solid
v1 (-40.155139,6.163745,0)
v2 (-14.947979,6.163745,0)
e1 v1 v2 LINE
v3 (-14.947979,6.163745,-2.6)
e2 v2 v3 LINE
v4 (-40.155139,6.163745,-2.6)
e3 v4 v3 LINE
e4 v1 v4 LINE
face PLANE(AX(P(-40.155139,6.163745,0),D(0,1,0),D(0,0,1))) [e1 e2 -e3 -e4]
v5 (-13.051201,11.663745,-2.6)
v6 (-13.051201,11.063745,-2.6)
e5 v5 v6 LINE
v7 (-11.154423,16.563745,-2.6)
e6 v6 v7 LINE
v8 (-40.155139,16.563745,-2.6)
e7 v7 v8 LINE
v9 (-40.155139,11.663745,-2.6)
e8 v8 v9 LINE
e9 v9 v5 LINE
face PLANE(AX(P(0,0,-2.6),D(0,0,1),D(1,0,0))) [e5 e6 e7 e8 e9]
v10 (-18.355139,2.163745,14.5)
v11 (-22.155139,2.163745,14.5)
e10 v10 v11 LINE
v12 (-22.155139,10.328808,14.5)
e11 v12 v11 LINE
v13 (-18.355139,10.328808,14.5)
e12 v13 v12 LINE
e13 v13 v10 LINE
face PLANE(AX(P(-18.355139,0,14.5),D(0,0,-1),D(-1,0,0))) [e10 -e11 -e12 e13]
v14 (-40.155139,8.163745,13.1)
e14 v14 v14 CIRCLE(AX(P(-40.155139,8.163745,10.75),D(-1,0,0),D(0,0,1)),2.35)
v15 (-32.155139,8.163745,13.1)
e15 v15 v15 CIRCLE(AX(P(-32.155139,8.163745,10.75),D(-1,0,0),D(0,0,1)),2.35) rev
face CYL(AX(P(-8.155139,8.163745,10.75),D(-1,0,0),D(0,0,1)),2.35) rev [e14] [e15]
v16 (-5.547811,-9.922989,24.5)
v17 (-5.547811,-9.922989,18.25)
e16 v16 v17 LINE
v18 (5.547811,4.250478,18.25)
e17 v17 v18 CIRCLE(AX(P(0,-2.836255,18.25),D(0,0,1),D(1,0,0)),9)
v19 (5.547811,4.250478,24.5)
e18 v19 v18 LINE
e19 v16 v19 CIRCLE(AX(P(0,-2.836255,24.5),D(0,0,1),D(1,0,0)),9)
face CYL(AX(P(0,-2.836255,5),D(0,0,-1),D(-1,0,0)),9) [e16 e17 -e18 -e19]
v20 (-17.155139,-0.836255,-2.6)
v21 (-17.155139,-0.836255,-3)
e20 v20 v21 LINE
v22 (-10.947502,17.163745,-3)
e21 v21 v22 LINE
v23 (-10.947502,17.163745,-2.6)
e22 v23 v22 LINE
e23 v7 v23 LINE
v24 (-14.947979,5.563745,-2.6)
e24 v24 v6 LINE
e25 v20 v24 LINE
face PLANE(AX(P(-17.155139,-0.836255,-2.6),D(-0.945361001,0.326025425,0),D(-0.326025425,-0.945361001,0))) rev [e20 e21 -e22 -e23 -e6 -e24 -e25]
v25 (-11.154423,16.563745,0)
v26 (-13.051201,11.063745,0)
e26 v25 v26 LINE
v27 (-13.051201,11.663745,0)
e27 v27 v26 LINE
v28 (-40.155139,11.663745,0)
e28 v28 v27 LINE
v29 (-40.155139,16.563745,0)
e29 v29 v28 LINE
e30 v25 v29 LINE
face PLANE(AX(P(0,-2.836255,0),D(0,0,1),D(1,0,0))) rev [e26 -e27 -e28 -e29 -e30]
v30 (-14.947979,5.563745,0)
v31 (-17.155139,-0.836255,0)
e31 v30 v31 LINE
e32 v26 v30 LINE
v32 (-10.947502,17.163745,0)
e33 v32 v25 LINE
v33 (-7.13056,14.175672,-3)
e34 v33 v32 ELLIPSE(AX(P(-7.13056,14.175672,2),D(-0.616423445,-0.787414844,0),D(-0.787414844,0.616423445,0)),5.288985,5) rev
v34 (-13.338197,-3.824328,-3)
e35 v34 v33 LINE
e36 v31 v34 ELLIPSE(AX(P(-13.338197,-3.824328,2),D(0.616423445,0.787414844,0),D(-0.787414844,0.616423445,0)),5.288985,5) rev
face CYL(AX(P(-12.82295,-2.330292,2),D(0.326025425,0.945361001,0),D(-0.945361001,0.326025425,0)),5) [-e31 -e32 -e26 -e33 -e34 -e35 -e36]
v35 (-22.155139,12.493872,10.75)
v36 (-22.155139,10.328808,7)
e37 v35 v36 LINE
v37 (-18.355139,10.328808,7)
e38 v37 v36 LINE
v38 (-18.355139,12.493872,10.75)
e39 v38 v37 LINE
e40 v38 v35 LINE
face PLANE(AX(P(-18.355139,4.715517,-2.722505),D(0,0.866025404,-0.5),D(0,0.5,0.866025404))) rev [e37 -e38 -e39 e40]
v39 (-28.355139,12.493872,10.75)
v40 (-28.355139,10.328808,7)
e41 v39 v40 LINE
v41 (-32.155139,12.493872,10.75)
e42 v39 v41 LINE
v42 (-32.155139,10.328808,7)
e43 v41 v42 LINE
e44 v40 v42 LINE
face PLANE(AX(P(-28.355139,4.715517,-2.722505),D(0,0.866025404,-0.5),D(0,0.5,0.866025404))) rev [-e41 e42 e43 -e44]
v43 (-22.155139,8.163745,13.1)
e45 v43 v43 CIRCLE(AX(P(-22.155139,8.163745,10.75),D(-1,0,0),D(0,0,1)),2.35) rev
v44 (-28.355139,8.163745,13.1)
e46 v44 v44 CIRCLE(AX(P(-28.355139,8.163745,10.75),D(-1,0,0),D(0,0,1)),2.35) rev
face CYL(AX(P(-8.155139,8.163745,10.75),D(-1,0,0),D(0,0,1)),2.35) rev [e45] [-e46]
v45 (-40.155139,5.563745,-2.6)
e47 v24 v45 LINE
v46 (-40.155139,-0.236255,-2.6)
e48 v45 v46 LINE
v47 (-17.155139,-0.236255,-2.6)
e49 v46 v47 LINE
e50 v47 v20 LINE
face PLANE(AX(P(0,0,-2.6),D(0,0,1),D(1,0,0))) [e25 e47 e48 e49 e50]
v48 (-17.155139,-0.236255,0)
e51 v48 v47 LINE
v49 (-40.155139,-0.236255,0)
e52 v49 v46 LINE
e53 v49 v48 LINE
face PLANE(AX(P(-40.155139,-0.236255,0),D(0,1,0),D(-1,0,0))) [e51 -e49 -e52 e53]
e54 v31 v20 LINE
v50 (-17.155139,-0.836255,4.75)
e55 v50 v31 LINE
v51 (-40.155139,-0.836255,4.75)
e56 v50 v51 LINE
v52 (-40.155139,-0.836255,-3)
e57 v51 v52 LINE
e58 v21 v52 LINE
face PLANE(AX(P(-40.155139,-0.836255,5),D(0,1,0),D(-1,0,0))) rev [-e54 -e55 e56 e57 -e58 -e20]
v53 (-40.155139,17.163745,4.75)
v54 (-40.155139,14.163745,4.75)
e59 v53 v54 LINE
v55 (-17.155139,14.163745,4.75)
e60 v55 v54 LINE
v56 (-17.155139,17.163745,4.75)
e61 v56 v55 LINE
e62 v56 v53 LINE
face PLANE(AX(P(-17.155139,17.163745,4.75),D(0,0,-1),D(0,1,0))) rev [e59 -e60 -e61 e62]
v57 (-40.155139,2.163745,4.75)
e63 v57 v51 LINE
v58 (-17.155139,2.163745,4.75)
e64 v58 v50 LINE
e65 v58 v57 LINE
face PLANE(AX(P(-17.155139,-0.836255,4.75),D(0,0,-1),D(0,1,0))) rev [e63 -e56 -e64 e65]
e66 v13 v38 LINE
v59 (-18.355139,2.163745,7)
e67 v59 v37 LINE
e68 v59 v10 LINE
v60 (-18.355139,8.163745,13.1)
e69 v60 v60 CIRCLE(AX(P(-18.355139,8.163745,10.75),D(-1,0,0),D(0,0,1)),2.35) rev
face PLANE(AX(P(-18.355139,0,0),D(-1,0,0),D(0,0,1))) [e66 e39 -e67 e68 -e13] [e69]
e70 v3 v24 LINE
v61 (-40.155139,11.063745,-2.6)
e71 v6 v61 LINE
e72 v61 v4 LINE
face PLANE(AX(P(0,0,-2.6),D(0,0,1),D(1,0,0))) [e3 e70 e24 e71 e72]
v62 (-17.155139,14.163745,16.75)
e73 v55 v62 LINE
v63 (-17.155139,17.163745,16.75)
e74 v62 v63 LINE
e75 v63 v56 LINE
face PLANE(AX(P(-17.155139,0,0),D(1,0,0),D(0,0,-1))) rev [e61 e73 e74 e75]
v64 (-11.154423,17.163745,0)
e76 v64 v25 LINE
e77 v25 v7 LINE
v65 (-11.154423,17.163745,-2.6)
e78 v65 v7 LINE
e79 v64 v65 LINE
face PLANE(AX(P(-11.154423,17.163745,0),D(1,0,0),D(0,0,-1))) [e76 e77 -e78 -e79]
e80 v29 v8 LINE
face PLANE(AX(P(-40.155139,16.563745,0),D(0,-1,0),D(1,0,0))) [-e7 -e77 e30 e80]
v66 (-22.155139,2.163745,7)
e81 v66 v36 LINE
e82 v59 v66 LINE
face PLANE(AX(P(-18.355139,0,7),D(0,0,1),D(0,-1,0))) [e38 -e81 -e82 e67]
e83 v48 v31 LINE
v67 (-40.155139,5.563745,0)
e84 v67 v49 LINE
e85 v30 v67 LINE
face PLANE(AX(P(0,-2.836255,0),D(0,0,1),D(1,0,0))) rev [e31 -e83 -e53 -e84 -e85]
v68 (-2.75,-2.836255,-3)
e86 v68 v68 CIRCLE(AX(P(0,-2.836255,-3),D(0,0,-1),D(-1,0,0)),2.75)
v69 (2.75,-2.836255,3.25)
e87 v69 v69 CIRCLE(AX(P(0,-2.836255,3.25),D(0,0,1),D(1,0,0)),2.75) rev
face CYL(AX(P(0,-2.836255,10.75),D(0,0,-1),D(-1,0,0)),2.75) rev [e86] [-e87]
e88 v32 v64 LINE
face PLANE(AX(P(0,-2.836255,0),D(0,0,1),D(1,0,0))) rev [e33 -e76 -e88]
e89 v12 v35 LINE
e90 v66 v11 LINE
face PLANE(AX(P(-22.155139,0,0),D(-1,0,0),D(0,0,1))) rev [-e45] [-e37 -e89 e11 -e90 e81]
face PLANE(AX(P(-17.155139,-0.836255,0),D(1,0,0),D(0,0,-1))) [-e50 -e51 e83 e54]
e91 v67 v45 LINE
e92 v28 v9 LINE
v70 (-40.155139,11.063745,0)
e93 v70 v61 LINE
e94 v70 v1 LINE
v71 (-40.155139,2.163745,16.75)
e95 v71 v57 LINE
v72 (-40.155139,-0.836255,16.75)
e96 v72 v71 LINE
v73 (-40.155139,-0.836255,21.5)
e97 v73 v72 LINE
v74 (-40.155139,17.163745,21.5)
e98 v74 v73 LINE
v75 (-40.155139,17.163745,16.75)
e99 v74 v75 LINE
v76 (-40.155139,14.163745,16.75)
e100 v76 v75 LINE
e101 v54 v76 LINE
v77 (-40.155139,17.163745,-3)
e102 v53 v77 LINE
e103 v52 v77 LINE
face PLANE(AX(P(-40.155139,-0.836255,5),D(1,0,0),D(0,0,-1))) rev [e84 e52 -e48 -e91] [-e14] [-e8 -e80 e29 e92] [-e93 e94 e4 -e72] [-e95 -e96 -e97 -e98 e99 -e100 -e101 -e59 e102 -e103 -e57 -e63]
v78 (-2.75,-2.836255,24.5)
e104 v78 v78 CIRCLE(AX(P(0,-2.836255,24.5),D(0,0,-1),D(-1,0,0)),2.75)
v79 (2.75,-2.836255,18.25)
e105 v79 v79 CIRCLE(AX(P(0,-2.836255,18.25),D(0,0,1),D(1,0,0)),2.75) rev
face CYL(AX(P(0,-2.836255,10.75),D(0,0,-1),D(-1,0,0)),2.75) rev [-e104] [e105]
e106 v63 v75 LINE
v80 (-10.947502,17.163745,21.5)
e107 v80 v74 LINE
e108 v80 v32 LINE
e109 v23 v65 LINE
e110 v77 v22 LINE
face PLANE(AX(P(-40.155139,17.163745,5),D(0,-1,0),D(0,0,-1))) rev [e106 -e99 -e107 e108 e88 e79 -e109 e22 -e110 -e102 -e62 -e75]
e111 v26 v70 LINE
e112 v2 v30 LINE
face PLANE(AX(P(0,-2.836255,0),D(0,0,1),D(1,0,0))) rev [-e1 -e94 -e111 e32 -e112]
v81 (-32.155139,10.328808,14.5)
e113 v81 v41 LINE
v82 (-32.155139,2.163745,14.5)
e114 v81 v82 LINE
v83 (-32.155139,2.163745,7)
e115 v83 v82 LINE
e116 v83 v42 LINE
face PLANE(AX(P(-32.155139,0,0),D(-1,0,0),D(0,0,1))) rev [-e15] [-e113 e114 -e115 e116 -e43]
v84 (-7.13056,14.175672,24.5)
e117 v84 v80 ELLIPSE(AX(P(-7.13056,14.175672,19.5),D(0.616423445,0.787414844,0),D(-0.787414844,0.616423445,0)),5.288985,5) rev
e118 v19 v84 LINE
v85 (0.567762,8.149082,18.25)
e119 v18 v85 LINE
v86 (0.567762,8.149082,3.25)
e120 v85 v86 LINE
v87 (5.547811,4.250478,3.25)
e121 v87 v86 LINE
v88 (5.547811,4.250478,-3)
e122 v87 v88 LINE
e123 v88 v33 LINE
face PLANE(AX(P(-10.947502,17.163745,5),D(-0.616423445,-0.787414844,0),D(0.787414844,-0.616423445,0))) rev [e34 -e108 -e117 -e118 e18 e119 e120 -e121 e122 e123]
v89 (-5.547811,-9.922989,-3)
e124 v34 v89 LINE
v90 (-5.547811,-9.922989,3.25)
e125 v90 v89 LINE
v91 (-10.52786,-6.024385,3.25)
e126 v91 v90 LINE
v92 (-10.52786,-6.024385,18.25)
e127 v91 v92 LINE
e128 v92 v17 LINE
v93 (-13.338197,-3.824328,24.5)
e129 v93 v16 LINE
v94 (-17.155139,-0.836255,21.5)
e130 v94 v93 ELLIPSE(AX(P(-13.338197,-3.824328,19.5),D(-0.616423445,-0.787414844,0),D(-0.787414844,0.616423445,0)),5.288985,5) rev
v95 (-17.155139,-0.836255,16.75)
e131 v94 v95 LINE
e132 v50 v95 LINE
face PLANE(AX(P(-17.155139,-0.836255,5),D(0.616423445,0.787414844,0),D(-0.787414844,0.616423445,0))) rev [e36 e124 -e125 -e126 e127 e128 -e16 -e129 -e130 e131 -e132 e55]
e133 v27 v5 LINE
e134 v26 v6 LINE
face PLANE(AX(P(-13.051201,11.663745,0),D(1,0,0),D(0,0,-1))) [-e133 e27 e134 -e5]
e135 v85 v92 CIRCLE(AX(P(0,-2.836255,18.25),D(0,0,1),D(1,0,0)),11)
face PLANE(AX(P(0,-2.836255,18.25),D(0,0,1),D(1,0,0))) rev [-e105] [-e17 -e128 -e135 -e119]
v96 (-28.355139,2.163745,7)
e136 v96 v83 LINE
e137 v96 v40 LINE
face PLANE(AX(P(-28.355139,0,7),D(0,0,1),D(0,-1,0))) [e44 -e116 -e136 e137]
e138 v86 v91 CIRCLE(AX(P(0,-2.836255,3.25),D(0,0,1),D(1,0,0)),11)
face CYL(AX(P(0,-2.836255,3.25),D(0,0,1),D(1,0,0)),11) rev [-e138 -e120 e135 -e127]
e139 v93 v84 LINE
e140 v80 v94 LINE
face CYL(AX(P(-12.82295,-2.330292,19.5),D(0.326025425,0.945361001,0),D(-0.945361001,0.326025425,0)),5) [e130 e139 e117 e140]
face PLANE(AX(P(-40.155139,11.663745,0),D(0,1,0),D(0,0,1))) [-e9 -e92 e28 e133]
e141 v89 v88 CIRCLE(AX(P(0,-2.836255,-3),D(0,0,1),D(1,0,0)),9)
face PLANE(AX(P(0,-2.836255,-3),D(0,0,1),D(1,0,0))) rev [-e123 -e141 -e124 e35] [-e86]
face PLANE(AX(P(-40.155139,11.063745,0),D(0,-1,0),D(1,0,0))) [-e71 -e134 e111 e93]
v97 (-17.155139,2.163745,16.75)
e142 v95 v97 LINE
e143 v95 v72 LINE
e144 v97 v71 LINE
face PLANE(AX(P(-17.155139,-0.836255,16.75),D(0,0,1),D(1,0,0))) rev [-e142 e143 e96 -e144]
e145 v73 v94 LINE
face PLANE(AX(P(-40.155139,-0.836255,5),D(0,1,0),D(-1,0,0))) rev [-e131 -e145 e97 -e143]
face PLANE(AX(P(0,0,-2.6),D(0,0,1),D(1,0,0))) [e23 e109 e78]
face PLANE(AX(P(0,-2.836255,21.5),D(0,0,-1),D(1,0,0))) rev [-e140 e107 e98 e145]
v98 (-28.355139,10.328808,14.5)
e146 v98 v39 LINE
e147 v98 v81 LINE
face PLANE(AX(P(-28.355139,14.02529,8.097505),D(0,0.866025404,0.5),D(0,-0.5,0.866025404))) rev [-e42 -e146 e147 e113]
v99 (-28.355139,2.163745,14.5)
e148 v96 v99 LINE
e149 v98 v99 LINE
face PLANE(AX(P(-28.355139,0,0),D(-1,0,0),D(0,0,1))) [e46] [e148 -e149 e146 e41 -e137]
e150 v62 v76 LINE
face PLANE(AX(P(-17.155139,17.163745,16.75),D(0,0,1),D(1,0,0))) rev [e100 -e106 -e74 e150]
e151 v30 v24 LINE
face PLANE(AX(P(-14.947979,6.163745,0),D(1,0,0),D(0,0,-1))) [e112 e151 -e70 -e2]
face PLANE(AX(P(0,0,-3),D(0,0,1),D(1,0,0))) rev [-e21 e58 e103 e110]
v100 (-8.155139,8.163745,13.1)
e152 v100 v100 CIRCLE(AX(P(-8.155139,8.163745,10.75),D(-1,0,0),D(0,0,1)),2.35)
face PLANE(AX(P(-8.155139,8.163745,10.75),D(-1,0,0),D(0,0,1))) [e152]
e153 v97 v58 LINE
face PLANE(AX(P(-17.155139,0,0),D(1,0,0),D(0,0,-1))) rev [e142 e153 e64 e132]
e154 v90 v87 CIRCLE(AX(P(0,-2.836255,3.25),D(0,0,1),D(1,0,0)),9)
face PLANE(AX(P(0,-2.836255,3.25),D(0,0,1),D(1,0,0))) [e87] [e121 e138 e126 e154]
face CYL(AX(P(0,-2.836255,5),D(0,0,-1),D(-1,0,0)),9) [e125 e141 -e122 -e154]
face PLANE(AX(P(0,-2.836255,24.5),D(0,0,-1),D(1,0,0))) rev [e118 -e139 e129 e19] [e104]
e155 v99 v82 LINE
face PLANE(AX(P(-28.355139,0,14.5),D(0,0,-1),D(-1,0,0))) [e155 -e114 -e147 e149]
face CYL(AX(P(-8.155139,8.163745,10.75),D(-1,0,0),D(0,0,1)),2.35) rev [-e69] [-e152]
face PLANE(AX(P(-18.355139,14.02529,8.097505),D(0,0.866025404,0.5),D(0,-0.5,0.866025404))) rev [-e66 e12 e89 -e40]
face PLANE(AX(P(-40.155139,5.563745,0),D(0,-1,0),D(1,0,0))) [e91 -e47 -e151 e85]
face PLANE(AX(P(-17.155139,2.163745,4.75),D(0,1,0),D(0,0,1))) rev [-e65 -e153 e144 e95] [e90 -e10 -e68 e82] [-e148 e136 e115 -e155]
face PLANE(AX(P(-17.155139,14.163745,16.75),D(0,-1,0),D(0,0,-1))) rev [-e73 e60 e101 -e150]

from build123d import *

# Parameters (mm, degrees)
BOSS_EXTRUDE1_DEPTH  = 5
BOSS_EXTRUDE7_DEPTH  = 5.75
BOSS_EXTRUDE8_START  = -3
BOSS_EXTRUDE8_DEPTH  = 3
SKETCH15_R           = 2.75
CUT_EXTRUDE7_DEPTH   = 46.783095044
FILLET2_R            = 5
SKETCH16_W           = 12
SKETCH16_H           = 3
CUT_EXTRUDE8_DEPTH   = 23
SKETCH17_R           = 2.35
CUT_EXTRUDE9_DEPTH   = 32
CUT_EXTRUDE11_START  = -8
CUT_EXTRUDE11_DEPTH  = 3.8
LPATTERN1_COUNT      = 2
LPATTERN1_PITCH      = 10
SKETCH26_R           = 11
CUT_EXTRUDE12_DEPTH  = 7.5
SKETCH28_W           = 29.000715486
SKETCH28_H           = 0.6
SKETCH28_W_2         = 23
SKETCH28_W_3         = 27.103937603
SKETCH28_W_4         = 25.207159719
BOSS_EXTRUDE9_DEPTH  = 3
BOSS_EXTRUDE10_DEPTH = 0.4


with BuildPart() as part:
    # Sketch1 → Boss-Extrude1 (new body)
    with BuildSketch(Plane.XY):
        with BuildLine():
            Line((-40.155138696, -0.836255417), (-17.155138696, -0.836255417))
            Line((-17.155138696, -0.836255417), (-5.547811002, -9.922989015))
            ThreePointArc((-5.547811002, -9.922989015), (7.086733598, -8.384066419), (5.547811002, 4.250478181))
            Line((5.547811002, 4.250478181), (-10.947501986, 17.163744583))
            Line((-10.947501986, 17.163744583), (-40.155138696, 17.163744583))
            Line((-40.155138696, 17.163744583), (-40.155138696, -0.836255417))
        make_face()
    extrude(amount=BOSS_EXTRUDE1_DEPTH)

    # Sketch14 → Boss-Extrude7 (add)
    with BuildSketch(Plane.XY.offset(5)):
        with BuildLine():
            Line((-40.155138696, -0.836255417), (-40.155138696, 17.163744583))
            Line((-40.155138696, 17.163744583), (-10.947501986, 17.163744583))
            Line((-10.947501986, 17.163744583), (5.547811002, 4.250478181))
            ThreePointArc((5.547811002, 4.250478181), (7.086733598, -8.384066419), (-5.547811002, -9.922989015))
            Line((-5.547811002, -9.922989015), (-17.155138696, -0.836255417))
            Line((-17.155138696, -0.836255417), (-40.155138696, -0.836255417))
        make_face()
    extrude(amount=BOSS_EXTRUDE7_DEPTH)

    # Sketch27 → Boss-Extrude8 (add)
    with BuildSketch(Plane.XY.offset(BOSS_EXTRUDE8_START)):
        with BuildLine():
            Line((-17.155138696, -0.836255417), (-10.947501986, 17.163744583))
            Line((-10.947501986, 17.163744583), (5.547811002, 4.250478181))
            ThreePointArc((5.547811002, 4.250478181), (7.086733598, -8.384066419), (-5.547811002, -9.922989015))
            Line((-5.547811002, -9.922989015), (-17.155138696, -0.836255417))
        make_face()
    extrude(amount=BOSS_EXTRUDE8_DEPTH)

    # Sketch15 → Cut-Extrude7 (cut, through all)
    with BuildSketch(Plane(origin=(0, 0, -3), x_dir=(-1, 0, 0), z_dir=(0, 0, -1))):
        with Locations((0, -2.836255417)):
            Circle(SKETCH15_R)
    extrude(amount=-CUT_EXTRUDE7_DEPTH, mode=Mode.SUBTRACT)

    # Fillet2
    # the kernel refuses this fillet: 5 mm, written as the material it takes off along each edge
    with BuildSketch(Plane(origin=(-20.89022917, -11.666726282, -3), x_dir=(0.9453610009462032, -0.32602542522016986, 0), z_dir=(0.3260254252201699, 0.9453610009462033, 0))) as fillet2_piece_1:
        with BuildLine():
            CenterArc((4.582575695, -5), FILLET2_R, 90, 66.421821522)
            Line((0, -3), (-0.091651514, -2.96))
            ThreePointArc((-0.091651514, -2.96), (-0.1, -1.5), (-0.1, 0))
            Line((-0.1, 0), (0, 0.1))
            Line((0, 0.1), (4.582575695, 0.1))
            Line((4.582575695, 0.1), (4.582575695, 0))
        make_face()
    extrude(amount=41.95322389, mode=Mode.SUBTRACT)

    # Mirror1: part across plane


with BuildPart() as part_1:
    add(part.part)
    add(part.part.mirror(Plane(origin=(0, -2.836255417, 10.75), x_dir=(1, 0, 0), z_dir=(0, 0, 1))))

    # Sketch16 → Cut-Extrude8 (cut)
    with BuildSketch(Plane.ZY.offset(40.155138696)):
        with Locations((10.75, 0.663744583)):
            Rectangle(SKETCH16_W, SKETCH16_H)
        with Locations((10.75, 15.663744583)):
            Rectangle(SKETCH16_W, SKETCH16_H)
    extrude(amount=-CUT_EXTRUDE8_DEPTH, mode=Mode.SUBTRACT)

    # Sketch17 → Cut-Extrude9 (cut)
    with BuildSketch(Plane.ZY.offset(40.155138696)):
        with Locations((10.75, 8.163744583)):
            Circle(SKETCH17_R)
    extrude(amount=-CUT_EXTRUDE9_DEPTH, mode=Mode.SUBTRACT)

    # Sketch20 → Cut-Extrude11 (cut)
    with BuildSketch(Plane.ZY.offset(40.155138696).offset(CUT_EXTRUDE11_START)):
        Polygon((14.5, 2.163744583), (14.5, 5.998681073), (10.75, 3.833617564), (7, 5.998681073), (7, 2.163744583), align=None)
        Polygon((10.75, 3.833617564), (14.5, 5.998681073), (14.5, 10.328808092), (10.75, 12.493871602), (7, 10.328808092), (7, 5.998681073), align=None)
    cut_extrude11 = extrude(amount=-CUT_EXTRUDE11_DEPTH, mode=Mode.SUBTRACT)

    # LPattern1: Cut-Extrude11 ×2
    with Locations(*[(i * LPATTERN1_PITCH, 0, 0) for i in range(1, LPATTERN1_COUNT)]):
        add(cut_extrude11, mode=Mode.SUBTRACT)

    # Sketch26 → Cut-Extrude12 (cut, symmetric)
    with BuildSketch(Plane.XY.offset(10.75)):
        with Locations((0, -2.836255417)):
            Circle(SKETCH26_R)
    extrude(amount=CUT_EXTRUDE12_DEPTH, both=True, mode=Mode.SUBTRACT)

    # Sketch28 → Boss-Extrude9 (add)
    with BuildSketch(Plane(origin=(0, 0, -3), x_dir=(-1, 0, 0), z_dir=(0, 0, -1))):
        with Locations((25.654780953, 16.863744583)):
            Rectangle(SKETCH28_W, SKETCH28_H)
        with Locations((28.655138696, -0.536255417)):
            Rectangle(SKETCH28_W_2, SKETCH28_H)
        with Locations((26.603169895, 11.363744583)):
            Rectangle(SKETCH28_W_3, SKETCH28_H)
        with Locations((27.551558836, 5.863744583)):
            Rectangle(SKETCH28_W_4, SKETCH28_H)
    extrude(amount=-BOSS_EXTRUDE9_DEPTH)

    # Sketch29 → Boss-Extrude10 (add)
    with BuildSketch(Plane(origin=(0, 0, -3), x_dir=(-1, 0, 0), z_dir=(0, 0, -1))):
        Polygon((40.155138696, 17.163744583), (40.155138696, -0.836255417), (17.155138696, -0.836255417), (11.15442321, 16.563744583), (10.947501986, 17.163744583), align=None)
    extrude(amount=-BOSS_EXTRUDE10_DEPTH)


solid = part_1.part
